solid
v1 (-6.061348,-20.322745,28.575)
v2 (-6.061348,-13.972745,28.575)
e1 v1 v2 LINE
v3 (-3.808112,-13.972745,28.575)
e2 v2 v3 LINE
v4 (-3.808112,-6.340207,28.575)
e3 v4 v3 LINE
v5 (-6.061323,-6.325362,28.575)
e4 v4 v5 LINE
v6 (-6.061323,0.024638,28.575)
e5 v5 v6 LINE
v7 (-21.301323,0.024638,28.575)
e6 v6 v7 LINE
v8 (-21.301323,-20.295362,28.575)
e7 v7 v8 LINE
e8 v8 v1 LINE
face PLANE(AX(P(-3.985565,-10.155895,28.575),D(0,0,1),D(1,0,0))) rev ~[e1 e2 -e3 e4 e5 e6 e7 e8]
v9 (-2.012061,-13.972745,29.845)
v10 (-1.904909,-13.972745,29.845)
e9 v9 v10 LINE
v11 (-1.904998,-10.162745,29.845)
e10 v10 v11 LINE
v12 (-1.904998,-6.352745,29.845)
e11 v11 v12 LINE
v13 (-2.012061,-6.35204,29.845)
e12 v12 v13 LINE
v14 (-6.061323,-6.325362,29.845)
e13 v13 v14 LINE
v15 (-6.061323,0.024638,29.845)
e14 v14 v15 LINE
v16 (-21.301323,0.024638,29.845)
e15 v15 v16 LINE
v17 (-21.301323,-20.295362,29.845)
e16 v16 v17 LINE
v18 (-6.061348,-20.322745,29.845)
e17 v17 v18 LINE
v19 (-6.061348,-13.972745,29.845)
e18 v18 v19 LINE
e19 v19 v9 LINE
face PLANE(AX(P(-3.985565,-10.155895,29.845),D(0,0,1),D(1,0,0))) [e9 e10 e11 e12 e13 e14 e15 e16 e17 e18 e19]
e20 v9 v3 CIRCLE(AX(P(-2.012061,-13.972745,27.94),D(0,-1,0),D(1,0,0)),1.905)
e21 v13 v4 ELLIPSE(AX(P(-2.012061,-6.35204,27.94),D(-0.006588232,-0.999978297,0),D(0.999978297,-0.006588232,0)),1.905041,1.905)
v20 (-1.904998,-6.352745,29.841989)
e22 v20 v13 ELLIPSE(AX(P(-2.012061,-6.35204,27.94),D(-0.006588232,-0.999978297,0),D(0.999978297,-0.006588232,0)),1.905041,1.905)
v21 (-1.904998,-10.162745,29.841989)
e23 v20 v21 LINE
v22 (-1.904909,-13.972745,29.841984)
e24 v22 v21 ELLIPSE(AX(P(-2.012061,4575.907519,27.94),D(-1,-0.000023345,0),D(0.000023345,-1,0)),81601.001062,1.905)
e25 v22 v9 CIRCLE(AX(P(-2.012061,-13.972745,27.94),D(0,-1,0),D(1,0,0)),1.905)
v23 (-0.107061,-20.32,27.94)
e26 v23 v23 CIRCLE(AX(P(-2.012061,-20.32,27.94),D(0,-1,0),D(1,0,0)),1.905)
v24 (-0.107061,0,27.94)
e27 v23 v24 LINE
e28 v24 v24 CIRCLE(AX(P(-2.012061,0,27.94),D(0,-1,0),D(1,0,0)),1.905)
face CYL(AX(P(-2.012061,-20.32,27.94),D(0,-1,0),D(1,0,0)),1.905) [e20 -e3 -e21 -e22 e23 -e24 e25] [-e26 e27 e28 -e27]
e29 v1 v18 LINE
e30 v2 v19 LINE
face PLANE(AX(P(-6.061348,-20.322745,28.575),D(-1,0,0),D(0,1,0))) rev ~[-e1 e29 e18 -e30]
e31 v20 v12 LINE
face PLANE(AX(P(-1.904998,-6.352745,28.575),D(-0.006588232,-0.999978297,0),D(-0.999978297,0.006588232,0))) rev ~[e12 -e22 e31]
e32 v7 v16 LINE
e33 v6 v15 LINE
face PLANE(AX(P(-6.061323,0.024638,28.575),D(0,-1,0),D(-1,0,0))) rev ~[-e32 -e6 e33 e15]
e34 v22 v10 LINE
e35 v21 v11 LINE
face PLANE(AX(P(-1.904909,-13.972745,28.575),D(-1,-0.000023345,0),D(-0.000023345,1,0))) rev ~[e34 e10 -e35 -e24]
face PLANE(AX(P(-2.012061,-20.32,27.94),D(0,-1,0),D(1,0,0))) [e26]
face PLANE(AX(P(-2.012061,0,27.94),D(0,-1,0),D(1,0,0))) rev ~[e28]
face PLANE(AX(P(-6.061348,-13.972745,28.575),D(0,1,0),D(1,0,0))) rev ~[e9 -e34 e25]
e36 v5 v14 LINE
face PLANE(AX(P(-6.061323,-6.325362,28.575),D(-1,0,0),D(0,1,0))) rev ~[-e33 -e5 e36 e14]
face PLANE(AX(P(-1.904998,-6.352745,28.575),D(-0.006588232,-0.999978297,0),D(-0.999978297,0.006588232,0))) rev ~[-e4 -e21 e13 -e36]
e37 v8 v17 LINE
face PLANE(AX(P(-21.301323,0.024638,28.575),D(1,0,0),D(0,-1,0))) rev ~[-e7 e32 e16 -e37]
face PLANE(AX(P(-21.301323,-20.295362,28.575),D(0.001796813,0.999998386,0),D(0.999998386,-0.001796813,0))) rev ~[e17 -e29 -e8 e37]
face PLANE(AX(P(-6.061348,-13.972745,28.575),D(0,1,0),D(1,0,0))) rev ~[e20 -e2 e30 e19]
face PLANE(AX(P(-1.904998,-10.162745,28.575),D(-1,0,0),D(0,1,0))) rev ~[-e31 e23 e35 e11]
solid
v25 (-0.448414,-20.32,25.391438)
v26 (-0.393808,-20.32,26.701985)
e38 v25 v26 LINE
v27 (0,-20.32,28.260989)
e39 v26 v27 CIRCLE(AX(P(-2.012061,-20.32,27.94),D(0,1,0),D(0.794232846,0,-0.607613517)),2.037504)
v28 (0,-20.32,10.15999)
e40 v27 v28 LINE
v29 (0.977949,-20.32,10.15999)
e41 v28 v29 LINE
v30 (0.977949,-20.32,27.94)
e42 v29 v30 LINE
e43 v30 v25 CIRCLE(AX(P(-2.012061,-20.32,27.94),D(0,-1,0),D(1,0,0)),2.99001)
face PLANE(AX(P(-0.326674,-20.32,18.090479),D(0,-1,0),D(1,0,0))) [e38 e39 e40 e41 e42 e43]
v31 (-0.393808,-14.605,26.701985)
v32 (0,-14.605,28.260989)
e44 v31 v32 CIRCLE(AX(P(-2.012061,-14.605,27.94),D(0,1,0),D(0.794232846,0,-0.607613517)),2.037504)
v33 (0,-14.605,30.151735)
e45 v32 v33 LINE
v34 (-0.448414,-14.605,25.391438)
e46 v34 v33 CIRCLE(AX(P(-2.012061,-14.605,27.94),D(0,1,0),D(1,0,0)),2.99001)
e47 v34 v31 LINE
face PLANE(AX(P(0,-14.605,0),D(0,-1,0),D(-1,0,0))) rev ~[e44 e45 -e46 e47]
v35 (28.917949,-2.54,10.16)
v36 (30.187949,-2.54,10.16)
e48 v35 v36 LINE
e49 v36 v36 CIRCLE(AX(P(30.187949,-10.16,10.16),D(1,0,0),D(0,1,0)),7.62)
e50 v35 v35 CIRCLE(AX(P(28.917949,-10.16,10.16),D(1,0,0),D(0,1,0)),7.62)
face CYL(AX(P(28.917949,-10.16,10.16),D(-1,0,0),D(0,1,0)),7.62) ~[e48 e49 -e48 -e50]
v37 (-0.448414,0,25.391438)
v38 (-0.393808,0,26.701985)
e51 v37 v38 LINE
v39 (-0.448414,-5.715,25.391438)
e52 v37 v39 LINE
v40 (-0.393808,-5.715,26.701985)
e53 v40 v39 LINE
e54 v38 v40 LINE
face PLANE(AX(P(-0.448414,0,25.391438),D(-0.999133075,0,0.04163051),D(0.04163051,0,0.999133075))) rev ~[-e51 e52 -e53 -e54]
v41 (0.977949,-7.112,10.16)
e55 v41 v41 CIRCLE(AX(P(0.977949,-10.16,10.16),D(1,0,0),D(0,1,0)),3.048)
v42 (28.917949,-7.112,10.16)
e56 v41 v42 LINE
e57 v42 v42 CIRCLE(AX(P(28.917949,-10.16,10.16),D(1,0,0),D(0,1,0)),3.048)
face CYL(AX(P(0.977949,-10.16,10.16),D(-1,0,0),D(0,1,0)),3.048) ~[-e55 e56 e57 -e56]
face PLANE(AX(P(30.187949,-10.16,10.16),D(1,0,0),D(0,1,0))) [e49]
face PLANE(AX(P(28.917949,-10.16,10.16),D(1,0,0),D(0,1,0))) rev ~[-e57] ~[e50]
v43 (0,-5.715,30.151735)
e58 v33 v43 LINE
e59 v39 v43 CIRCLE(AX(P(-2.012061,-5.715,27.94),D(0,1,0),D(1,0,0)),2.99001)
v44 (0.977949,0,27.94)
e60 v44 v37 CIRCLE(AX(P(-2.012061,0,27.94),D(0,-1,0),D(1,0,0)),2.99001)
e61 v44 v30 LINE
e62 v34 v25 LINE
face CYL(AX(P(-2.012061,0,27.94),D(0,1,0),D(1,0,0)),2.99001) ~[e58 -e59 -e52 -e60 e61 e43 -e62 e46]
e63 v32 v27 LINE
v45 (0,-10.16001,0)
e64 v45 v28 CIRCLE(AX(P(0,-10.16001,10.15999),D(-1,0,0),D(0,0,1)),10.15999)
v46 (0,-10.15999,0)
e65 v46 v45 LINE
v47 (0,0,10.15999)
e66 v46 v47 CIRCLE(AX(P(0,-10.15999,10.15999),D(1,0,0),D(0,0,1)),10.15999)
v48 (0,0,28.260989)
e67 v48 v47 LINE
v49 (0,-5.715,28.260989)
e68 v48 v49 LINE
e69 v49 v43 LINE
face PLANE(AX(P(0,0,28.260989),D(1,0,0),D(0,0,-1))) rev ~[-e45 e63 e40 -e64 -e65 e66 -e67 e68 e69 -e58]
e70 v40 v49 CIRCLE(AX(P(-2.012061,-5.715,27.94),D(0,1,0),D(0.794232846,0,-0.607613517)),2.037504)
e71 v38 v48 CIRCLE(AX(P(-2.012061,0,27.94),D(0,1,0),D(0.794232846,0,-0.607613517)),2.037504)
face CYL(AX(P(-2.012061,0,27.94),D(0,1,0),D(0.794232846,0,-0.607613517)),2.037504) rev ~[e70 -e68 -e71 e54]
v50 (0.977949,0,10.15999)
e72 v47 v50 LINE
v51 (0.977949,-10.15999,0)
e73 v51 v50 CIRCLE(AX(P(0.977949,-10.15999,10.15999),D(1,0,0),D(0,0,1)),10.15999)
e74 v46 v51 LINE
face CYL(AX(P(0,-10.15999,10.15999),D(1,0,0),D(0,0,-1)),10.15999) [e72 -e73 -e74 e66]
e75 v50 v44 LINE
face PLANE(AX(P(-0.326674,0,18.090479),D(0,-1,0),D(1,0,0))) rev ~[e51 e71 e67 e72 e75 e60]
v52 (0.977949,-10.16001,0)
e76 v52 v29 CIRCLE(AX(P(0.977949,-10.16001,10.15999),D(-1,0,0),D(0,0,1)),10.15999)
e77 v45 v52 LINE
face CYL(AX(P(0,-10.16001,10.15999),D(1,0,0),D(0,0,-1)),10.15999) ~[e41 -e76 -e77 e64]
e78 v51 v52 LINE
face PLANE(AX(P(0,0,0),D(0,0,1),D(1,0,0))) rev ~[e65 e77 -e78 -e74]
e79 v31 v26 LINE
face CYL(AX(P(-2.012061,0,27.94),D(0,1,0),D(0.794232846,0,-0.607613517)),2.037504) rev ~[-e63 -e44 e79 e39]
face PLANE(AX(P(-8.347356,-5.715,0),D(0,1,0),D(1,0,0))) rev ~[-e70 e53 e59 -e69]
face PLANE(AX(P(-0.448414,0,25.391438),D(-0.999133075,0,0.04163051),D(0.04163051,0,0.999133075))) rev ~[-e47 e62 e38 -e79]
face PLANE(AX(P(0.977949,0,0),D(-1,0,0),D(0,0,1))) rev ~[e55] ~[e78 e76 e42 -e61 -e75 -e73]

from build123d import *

# Parameters (mm, degrees)
F1_DEPTH  = 20.32
F2_W      = 6.6402247176
F2_H      = 4.445
F3_DEPTH  = 50.8
F4_R      = 1.905
F5_DEPTH  = 20.32
F8_DEPTH  = 1.27
F9_R      = 10.15999
F10_R     = 3.048
F11_DEPTH = 27.94
F12_R     = 7.62
F13_DEPTH = 1.27


# Not quite as in the source:
# - a fillet or chamfer is up to 0.001 mm smaller than in the source, because OpenCascade refuses the exact size


with BuildPart() as f1:
    # F0 (on Front) → F1 (new body)
    with BuildSketch(Plane.XZ):
        with BuildLine():
            Line((0, 28.2609894363), (0, 0))
            Line((0, 0), (0.9779490576, 0))
            Line((0.9779490576, 0), (0.9779490576, 27.94))
            ThreePointArc((0.9779490576, 27.94), (-4.6212260032, 29.4002809847), (-0.4484143049, 25.3914377043))
            Line((-0.4484143049, 25.3914377043), (-0.3938082239, 26.7019847298))
            ThreePointArc((-0.3938082239, 26.7019847298), (-3.9875154003, 28.439004333), (0, 28.2609894363))
        make_face()
    extrude(amount=F1_DEPTH)

    # F2 (on face) → F3 (cut)
    with BuildSketch(Plane(origin=(0, 0, 0), x_dir=(1, 0, 0), z_dir=(0, 0, -1))):
        with Locations((-3.3201123588, 7.9375)):
            Rectangle(F2_W, F2_H)
        with Locations((-3.3201123588, 12.3825)):
            Rectangle(F2_W, F2_H)
        Polygon((-6.6402247176, 5.715), (-6.6402247176, 10.16), (-6.6402247176, 14.605), (-8.3473562263, 14.605), (-8.3473562263, 5.715), align=None)
    extrude(amount=-F3_DEPTH, mode=Mode.SUBTRACT)

    # F9 (radius 10.16 in the source; OpenCascade refuses exactly that, so slightly less here)
    f9_edges = [f1.edges().sort_by_distance(p)[0] for p in [
        (0.488975, 0, 0),
        (0.488975, -20.32, 0),
    ]]
    fillet(f9_edges, radius=F9_R)

    # F10 (on face) → F11 (join)
    with BuildSketch(Plane.YZ.offset(0.9779490576)):
        with Locations((-10.16, 10.16)):
            Circle(F10_R)
    extrude(amount=F11_DEPTH)

    # F12 (on face) → F13 (join)
    with BuildSketch(Plane.YZ.offset(28.9179490576)):
        with Locations((-10.16, 10.16)):
            Circle(F12_R)
    extrude(amount=F13_DEPTH)


with BuildPart() as f5:
    # F4 (on face) → F5 (new body)
    with BuildSketch(Plane.XZ.offset(20.32)):
        with Locations((-2.0120612164, 27.94)):
            Circle(F4_R)
    extrude(amount=-F5_DEPTH)

    # F7 (on offset) → F8 (join)
    with BuildSketch(Plane.XY.offset(28.575)):
        Polygon((-6.0613232421, -6.325361908), (-6.0613478435, -13.9727453345), (-1.9049090762, -13.9727453345), (-1.9049980218, -10.1627453355), (-1.9049980218, -6.3527453355), align=None)
        Polygon((-6.0613478435, -20.3227453345), (-6.0613478435, -13.9727453345), (-6.0613232421, -6.325361908), (-6.0613232421, 0.024638092), (-21.3013232421, 0.024638092), (-21.3013232421, -20.295361908), align=None)
    extrude(amount=F8_DEPTH)


solid = Compound([f1.part, f5.part])
